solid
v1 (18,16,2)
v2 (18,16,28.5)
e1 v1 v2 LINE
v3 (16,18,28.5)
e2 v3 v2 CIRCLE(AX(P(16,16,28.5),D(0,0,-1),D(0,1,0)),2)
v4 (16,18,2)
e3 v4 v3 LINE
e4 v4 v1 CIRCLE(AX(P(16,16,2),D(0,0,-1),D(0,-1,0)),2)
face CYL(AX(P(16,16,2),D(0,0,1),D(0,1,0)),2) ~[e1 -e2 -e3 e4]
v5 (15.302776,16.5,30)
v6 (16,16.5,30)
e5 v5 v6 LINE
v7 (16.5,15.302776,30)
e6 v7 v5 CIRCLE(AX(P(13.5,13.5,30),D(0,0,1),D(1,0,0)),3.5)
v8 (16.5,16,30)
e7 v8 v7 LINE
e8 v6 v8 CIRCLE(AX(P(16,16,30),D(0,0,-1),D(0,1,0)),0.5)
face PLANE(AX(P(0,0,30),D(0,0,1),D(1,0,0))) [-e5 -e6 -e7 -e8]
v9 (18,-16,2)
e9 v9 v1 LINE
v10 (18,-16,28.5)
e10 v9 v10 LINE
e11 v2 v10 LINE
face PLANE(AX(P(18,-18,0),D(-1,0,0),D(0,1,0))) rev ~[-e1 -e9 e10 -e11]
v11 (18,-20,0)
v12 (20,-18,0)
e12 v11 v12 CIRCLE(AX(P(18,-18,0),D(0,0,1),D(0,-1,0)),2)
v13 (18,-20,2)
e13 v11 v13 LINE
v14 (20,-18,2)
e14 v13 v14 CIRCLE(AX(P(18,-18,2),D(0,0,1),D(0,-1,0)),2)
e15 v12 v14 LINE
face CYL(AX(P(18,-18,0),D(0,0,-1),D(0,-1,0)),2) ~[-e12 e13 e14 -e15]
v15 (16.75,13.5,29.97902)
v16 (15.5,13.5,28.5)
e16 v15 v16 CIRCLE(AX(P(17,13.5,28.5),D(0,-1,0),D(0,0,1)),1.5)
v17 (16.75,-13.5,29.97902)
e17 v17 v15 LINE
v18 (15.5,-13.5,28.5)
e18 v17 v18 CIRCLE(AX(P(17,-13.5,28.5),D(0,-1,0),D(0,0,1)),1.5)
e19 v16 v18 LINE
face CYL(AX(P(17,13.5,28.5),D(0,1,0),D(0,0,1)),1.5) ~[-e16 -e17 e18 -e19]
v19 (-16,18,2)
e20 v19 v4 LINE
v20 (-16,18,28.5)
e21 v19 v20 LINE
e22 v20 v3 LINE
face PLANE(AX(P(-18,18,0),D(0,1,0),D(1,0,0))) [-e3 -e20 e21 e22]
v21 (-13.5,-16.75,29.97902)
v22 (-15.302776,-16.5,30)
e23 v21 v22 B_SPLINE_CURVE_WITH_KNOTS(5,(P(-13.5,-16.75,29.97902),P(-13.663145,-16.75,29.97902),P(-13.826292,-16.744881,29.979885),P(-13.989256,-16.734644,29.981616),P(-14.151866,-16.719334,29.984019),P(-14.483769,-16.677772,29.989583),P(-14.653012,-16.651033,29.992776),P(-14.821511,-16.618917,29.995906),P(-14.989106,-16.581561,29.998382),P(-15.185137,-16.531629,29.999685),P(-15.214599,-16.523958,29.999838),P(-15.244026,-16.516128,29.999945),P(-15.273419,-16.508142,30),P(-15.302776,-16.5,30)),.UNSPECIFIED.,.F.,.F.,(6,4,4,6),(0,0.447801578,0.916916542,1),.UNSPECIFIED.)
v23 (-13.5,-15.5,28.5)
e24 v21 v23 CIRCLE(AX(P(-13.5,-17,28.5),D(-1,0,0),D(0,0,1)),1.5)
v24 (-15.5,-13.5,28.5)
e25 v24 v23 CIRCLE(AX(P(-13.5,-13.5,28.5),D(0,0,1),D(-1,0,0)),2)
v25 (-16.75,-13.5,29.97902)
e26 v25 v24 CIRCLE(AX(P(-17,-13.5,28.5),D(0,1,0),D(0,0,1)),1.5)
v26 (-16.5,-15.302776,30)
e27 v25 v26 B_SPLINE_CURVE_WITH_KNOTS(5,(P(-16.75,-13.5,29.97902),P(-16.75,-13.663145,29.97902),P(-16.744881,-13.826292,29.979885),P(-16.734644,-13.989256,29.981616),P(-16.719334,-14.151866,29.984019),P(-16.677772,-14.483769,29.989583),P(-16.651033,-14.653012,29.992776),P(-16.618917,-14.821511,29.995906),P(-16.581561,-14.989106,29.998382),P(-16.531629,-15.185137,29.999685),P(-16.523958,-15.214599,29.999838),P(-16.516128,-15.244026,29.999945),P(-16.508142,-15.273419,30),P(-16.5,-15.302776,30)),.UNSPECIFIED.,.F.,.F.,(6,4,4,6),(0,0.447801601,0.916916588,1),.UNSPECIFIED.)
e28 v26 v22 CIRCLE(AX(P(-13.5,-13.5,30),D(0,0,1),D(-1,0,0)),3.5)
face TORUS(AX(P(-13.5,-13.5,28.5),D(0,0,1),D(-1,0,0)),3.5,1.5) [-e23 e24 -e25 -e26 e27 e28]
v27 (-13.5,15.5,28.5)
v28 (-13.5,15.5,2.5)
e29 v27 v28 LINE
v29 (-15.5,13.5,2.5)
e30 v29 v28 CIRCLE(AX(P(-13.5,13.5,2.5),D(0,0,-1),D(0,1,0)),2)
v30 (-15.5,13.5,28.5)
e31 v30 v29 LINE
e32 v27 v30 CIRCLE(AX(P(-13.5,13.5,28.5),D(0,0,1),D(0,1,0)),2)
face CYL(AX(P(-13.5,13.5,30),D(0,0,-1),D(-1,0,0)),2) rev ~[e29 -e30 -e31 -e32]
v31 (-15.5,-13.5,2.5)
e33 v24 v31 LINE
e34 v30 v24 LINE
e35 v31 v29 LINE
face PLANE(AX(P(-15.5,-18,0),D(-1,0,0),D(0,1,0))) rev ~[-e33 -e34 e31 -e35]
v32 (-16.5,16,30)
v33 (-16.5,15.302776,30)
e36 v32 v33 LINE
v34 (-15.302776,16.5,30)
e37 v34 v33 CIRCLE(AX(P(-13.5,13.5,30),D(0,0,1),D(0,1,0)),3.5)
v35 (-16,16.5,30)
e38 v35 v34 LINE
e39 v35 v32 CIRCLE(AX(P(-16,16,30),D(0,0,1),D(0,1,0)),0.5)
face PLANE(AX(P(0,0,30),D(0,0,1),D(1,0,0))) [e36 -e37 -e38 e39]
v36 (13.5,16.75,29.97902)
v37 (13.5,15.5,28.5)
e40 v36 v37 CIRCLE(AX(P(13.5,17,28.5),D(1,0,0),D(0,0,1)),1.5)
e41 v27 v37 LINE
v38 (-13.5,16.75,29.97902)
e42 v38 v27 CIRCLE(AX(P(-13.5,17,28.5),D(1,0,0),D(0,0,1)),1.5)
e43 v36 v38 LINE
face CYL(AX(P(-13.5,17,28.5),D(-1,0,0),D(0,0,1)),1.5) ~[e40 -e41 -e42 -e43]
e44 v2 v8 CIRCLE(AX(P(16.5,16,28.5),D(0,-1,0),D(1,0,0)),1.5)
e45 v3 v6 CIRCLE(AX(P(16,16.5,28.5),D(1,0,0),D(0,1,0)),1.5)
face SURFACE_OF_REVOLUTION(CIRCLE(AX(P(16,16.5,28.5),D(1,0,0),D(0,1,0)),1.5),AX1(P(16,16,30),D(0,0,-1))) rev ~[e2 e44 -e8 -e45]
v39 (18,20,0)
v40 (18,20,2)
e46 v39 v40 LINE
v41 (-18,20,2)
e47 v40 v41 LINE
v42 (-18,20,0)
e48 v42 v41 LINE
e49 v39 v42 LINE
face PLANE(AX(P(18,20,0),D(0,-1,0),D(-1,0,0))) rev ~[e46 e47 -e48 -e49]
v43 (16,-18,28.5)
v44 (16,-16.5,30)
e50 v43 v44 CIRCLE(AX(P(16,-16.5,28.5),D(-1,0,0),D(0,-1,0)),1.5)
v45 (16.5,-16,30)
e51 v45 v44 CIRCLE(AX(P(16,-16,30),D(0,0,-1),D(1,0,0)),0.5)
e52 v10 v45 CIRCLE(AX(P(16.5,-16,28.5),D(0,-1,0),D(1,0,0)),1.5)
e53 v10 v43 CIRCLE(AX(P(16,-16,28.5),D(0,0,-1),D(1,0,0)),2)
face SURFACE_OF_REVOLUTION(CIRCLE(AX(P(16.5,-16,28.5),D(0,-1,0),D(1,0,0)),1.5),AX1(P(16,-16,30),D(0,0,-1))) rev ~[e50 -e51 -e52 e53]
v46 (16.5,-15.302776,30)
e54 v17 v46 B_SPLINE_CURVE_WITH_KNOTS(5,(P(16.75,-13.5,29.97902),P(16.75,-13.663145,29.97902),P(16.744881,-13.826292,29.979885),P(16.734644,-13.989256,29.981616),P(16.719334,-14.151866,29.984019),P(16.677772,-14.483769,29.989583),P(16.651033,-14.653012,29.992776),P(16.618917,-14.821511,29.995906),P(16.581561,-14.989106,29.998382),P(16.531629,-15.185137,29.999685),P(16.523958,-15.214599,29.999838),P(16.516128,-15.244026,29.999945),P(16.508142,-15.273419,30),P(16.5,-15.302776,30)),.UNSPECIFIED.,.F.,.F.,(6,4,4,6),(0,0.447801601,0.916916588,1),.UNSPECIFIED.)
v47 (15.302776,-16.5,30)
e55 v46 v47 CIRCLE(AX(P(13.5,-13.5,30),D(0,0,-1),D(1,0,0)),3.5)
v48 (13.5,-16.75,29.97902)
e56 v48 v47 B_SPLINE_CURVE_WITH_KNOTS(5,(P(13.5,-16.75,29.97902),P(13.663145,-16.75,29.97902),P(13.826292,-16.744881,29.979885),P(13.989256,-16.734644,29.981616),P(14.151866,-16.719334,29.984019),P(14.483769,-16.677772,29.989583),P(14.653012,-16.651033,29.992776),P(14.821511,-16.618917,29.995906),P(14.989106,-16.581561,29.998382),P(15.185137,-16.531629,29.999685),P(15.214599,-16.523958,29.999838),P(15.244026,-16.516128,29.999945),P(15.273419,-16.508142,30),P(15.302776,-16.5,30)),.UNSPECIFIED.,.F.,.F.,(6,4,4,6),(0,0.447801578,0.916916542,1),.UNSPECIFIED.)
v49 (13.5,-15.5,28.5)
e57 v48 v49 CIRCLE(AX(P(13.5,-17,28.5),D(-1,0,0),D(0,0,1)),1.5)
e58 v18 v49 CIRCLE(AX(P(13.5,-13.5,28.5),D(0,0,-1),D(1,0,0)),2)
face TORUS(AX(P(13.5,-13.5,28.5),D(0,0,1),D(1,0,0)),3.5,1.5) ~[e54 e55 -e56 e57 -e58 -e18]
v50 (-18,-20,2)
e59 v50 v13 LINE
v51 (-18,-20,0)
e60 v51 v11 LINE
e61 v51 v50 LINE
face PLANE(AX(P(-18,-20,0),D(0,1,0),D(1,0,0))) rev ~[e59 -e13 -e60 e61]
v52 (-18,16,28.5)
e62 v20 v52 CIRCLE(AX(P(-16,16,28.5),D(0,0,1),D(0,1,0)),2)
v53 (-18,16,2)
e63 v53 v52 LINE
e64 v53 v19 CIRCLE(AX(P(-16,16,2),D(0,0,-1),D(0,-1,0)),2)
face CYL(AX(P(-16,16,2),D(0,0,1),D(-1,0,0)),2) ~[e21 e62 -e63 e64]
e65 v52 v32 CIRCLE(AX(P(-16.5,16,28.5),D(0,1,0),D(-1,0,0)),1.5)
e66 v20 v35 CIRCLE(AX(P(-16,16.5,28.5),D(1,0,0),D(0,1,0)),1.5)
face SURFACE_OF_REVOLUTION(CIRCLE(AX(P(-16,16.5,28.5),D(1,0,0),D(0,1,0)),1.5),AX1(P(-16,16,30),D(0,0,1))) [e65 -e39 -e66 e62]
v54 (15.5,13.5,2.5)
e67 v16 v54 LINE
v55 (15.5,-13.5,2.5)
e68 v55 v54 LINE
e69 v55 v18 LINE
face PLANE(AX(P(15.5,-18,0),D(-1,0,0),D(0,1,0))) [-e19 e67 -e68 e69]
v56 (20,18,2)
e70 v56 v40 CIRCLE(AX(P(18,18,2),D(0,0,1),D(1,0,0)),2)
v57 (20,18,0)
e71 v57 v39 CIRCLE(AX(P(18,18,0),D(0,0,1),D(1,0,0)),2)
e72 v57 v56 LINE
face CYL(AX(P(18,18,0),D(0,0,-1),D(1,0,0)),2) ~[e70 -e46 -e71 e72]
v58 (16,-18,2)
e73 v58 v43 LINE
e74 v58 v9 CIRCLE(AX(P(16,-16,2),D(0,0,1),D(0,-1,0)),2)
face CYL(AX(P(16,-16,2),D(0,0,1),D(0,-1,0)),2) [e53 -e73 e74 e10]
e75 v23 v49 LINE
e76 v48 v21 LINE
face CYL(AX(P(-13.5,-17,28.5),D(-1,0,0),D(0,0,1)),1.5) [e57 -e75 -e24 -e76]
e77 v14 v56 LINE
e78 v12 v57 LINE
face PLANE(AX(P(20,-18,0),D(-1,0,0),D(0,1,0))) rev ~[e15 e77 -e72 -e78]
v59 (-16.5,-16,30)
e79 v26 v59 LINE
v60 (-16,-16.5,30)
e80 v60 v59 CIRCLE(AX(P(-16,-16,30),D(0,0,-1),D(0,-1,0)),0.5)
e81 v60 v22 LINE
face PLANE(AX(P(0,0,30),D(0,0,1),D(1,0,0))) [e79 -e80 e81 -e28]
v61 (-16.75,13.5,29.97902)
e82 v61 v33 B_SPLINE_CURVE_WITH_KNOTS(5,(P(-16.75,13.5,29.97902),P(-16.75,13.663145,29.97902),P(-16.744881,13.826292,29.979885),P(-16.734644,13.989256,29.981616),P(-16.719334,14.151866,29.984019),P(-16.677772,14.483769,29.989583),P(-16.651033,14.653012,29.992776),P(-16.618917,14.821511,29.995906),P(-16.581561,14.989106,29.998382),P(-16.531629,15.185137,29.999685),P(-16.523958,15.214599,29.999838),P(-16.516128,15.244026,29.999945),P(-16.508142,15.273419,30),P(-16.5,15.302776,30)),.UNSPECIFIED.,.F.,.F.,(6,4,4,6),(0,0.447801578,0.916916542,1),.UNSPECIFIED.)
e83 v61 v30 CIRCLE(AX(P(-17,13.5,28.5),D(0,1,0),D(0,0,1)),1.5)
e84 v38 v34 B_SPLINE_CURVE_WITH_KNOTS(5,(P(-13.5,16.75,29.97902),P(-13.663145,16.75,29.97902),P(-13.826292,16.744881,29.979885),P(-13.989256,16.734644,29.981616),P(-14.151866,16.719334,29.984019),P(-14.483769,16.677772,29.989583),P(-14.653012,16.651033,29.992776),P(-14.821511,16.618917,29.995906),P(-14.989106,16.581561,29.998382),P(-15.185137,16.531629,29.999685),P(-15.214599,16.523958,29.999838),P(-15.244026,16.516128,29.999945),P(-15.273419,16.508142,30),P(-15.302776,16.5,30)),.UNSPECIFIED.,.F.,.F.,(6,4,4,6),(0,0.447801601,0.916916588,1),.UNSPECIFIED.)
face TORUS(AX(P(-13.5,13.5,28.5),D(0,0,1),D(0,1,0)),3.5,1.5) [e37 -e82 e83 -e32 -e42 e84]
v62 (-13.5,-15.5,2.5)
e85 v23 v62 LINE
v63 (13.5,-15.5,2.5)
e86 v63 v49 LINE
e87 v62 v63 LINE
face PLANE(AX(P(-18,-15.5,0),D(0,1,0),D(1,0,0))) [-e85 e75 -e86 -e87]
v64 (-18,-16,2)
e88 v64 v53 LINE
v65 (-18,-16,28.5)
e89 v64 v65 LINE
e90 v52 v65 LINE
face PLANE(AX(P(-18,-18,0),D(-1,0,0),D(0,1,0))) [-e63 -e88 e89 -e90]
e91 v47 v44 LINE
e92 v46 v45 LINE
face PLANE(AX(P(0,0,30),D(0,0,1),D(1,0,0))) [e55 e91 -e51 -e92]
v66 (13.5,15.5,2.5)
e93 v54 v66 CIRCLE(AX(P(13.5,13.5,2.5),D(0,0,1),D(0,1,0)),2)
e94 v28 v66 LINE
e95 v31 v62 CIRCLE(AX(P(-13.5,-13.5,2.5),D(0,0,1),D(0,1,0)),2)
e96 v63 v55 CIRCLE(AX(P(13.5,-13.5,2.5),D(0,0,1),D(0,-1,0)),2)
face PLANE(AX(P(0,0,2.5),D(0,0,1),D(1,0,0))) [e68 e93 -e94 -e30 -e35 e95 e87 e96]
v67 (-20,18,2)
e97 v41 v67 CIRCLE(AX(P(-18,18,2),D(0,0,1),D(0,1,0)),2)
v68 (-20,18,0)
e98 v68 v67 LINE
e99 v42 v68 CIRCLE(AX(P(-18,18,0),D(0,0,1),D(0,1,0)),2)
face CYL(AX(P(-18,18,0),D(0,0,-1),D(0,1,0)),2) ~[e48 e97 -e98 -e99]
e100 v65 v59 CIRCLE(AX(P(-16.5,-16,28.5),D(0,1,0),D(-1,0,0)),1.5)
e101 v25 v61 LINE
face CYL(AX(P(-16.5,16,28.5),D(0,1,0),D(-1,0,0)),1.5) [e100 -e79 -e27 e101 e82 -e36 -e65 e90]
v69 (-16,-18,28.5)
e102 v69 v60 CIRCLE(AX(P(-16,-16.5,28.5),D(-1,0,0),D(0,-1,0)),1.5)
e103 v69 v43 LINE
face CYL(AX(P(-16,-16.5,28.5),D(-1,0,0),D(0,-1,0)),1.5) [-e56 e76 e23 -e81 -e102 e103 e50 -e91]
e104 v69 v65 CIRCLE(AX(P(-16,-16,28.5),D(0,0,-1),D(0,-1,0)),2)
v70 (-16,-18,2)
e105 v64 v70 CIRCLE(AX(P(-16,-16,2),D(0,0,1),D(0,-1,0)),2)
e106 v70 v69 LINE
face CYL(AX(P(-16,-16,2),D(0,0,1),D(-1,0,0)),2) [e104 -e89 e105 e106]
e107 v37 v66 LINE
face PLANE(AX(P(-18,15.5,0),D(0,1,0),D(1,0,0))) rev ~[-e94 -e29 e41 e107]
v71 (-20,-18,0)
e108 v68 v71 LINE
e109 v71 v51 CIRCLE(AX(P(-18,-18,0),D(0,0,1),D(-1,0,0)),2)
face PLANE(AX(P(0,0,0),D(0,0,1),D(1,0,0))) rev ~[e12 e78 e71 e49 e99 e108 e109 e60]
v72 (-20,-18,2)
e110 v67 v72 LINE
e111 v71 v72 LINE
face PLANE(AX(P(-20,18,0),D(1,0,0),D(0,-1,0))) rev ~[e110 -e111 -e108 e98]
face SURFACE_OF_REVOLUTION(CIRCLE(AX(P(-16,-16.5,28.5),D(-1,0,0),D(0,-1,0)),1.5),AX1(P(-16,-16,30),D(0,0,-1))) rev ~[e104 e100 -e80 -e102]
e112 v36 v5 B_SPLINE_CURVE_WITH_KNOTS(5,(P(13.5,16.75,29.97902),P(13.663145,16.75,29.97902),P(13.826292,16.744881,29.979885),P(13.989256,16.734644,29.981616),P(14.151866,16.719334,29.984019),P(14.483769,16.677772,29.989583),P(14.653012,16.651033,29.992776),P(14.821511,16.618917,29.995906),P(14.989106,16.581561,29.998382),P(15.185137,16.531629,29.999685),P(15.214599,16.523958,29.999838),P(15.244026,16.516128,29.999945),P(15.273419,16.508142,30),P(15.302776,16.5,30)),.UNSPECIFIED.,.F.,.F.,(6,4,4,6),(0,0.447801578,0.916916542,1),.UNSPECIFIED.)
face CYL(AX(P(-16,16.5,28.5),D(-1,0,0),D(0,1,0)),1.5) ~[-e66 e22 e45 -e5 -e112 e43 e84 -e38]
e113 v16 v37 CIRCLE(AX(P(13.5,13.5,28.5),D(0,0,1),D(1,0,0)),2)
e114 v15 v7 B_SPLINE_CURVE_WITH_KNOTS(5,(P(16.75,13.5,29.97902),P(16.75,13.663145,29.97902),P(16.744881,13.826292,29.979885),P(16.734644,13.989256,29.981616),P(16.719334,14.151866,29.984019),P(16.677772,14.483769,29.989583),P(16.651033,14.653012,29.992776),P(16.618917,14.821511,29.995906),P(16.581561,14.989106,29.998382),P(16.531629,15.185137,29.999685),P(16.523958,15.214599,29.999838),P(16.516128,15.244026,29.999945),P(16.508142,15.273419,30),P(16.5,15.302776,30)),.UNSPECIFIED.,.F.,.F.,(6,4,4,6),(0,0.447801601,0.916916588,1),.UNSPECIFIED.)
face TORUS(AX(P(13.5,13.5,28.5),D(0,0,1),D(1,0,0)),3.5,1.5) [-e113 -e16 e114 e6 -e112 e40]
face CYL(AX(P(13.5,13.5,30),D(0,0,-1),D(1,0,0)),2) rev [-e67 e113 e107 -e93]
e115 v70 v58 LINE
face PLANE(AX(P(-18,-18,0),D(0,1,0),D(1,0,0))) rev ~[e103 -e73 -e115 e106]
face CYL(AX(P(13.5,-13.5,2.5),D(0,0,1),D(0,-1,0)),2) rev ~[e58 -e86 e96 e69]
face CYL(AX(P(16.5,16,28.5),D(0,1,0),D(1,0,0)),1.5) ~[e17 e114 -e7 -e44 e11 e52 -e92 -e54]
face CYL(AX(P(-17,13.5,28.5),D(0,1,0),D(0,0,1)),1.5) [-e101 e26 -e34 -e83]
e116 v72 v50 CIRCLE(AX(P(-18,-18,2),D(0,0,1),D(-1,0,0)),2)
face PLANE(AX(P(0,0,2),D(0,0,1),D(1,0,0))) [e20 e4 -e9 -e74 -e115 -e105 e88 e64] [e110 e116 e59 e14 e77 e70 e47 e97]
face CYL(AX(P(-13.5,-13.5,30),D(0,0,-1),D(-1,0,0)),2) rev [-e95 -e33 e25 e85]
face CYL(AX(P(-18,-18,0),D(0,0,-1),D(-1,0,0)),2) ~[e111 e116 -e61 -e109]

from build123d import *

# Parameters (mm, degrees)
F0_W         = 36
F0_H         = 36
F1_DEPTH     = 2
F2_DEPTH     = 30
F3_T         = -2.5
F4_R         = 2
F5_T1_DEPTH  = 32
F5_T3_DEPTH  = 27
F5_T5_DEPTH  = 32
F5_T7_DEPTH  = 27
F5_T10_ANGLE = 90
F5_T12_ANGLE = 90
F5_T14_ANGLE = 90
F5_T16_ANGLE = 90
F5_T18_ANGLE = 90
F5_T20_ANGLE = 90
F5_T22_ANGLE = 90
F5_T24_ANGLE = 90


# Not quite as in the source:
# - a fillet or chamfer that OpenCascade refuses, or shapes differently, is made with other operations: its cross-section is extruded or revolved along the edge and cut away or added


with BuildPart() as f1:
    # F0 (on Top) → F1 (new body)
    with BuildSketch(Plane.XY):
        with BuildLine():
            ThreePointArc((20, 18), (19.4142135624, 19.4142135624), (18, 20))
            Line((18, 20), (-18, 20))
            ThreePointArc((-18, 20), (-19.4142135624, 19.4142135624), (-20, 18))
            Line((-20, 18), (-20, -18))
            ThreePointArc((-20, -18), (-19.4142135624, -19.4142135624), (-18, -20))
            Line((-18, -20), (18, -20))
            ThreePointArc((18, -20), (19.4142135624, -19.4142135624), (20, -18))
            Line((20, -18), (20, 18))
        make_face()
        Rectangle(F0_W, F0_H, mode=Mode.SUBTRACT)
    extrude(amount=F1_DEPTH)

    # F0 (on Top) → F2 (join)
    with BuildSketch(Plane.XY):
        Rectangle(F0_W, F0_H)
    extrude(amount=F2_DEPTH)

    # F3
    f3_openings = [f1.faces().sort_by_distance(p)[0] for p in [
        (0, 0, 30),
    ]]
    offset(amount=F3_T, openings=f3_openings)

    # F4
    f4_edges = [f1.edges().sort_by_distance(p)[0] for p in [
        (-18, -18, 16),
        (18, 18, 16),
        (-18, 18, 16),
        (18, -18, 16),
        (-15.5, -15.5, 16.25),
        (15.5, -15.5, 16.25),
        (15.5, 15.5, 16.25),
        (-15.5, 15.5, 16.25),
    ]]
    fillet(f4_edges, radius=F4_R)

    # F5: fillet of radius 1.5 on 16 edges, made by hand

    # F5_s2 → F5_t1 (cut)
    with BuildSketch(Plane.XZ.offset(-16)):
        with BuildLine():
            ThreePointArc((-18, 28.5), (-17.5606601718, 29.5606601718), (-16.5, 30))
            Line((-16.5, 30), (-18, 30))
            Line((-18, 30), (-18, 28.5))
        make_face()
        with BuildLine():
            ThreePointArc((18, 28.5), (17.5606601718, 29.5606601718), (16.5, 30))
            Line((16.5, 30), (18, 30))
            Line((18, 30), (18, 28.5))
        make_face()
    extrude(amount=F5_T1_DEPTH, mode=Mode.SUBTRACT)

    # F5_s4 → F5_t3 (cut)
    with BuildSketch(Plane.XZ.offset(-13.5)):
        with BuildLine():
            ThreePointArc((-17, 30), (-15.9393398282, 29.5606601718), (-15.5, 28.5))
            Line((-15.5, 28.5), (-15.5, 30))
            Line((-15.5, 30), (-17, 30))
        make_face()
        with BuildLine():
            ThreePointArc((17, 30), (15.9393398282, 29.5606601718), (15.5, 28.5))
            Line((15.5, 28.5), (15.5, 30))
            Line((15.5, 30), (17, 30))
        make_face()
    extrude(amount=F5_T3_DEPTH, mode=Mode.SUBTRACT)

    # F5_s6 → F5_t5 (cut)
    with BuildSketch(Plane.YZ.offset(-16)):
        with BuildLine():
            ThreePointArc((18, 28.5), (17.5606601718, 29.5606601718), (16.5, 30))
            Line((16.5, 30), (18, 30))
            Line((18, 30), (18, 28.5))
        make_face()
        with BuildLine():
            ThreePointArc((-18, 28.5), (-17.5606601718, 29.5606601718), (-16.5, 30))
            Line((-16.5, 30), (-18, 30))
            Line((-18, 30), (-18, 28.5))
        make_face()
    extrude(amount=F5_T5_DEPTH, mode=Mode.SUBTRACT)

    # F5_s8 → F5_t7 (cut)
    with BuildSketch(Plane.YZ.offset(-13.5)):
        with BuildLine():
            ThreePointArc((-17, 30), (-15.9393398282, 29.5606601718), (-15.5, 28.5))
            Line((-15.5, 28.5), (-15.5, 30))
            Line((-15.5, 30), (-17, 30))
        make_face()
        with BuildLine():
            ThreePointArc((17, 30), (15.9393398282, 29.5606601718), (15.5, 28.5))
            Line((15.5, 28.5), (15.5, 30))
            Line((15.5, 30), (17, 30))
        make_face()
    extrude(amount=F5_T7_DEPTH, mode=Mode.SUBTRACT)

    # F5_s9 → F5_t10 (revolve, cut)
    with BuildSketch(Plane.YZ.offset(-16)):
        with BuildLine():
            ThreePointArc((18, 28.5), (17.5606601718, 29.5606601718), (16.5, 30))
            Line((16.5, 30), (18, 30))
            Line((18, 30), (18, 28.5))
        make_face()
    revolve(axis=Axis((-16, 16, 30), (0, 0, 1)), revolution_arc=F5_T10_ANGLE, mode=Mode.SUBTRACT)

    # F5_s11 → F5_t12 (revolve, cut)
    with BuildSketch(Plane.YZ.offset(16)):
        with BuildLine():
            ThreePointArc((18, 28.5), (17.5606601718, 29.5606601718), (16.5, 30))
            Line((16.5, 30), (18, 30))
            Line((18, 30), (18, 28.5))
        make_face()
    revolve(axis=Axis((16, 16, 30), (0, 0, -1)), revolution_arc=F5_T12_ANGLE, mode=Mode.SUBTRACT)

    # F5_s13 → F5_t14 (revolve, cut)
    with BuildSketch(Plane.YZ.offset(-16)):
        with BuildLine():
            ThreePointArc((-18, 28.5), (-17.5606601718, 29.5606601718), (-16.5, 30))
            Line((-16.5, 30), (-18, 30))
            Line((-18, 30), (-18, 28.5))
        make_face()
    revolve(axis=Axis((-16, -16, 30), (0, 0, -1)), revolution_arc=F5_T14_ANGLE, mode=Mode.SUBTRACT)

    # F5_s15 → F5_t16 (revolve, cut)
    with BuildSketch(Plane.XZ.offset(16)):
        with BuildLine():
            ThreePointArc((18, 28.5), (17.5606601718, 29.5606601718), (16.5, 30))
            Line((16.5, 30), (18, 30))
            Line((18, 30), (18, 28.5))
        make_face()
    revolve(axis=Axis((16, -16, 30), (0, 0, -1)), revolution_arc=F5_T16_ANGLE, mode=Mode.SUBTRACT)

    # F5_s17 → F5_t18 (revolve, cut)
    with BuildSketch(Plane.XZ.offset(13.5)):
        with BuildLine():
            ThreePointArc((17, 30), (15.9393398282, 29.5606601718), (15.5, 28.5))
            Line((15.5, 28.5), (15.5, 30))
            Line((15.5, 30), (17, 30))
        make_face()
    revolve(axis=Axis((13.5, -13.5, 30), (0, 0, -1)), revolution_arc=F5_T18_ANGLE, mode=Mode.SUBTRACT)

    # F5_s19 → F5_t20 (revolve, cut)
    with BuildSketch(Plane.XZ.offset(-13.5)):
        with BuildLine():
            ThreePointArc((17, 30), (15.9393398282, 29.5606601718), (15.5, 28.5))
            Line((15.5, 28.5), (15.5, 30))
            Line((15.5, 30), (17, 30))
        make_face()
    revolve(axis=Axis((13.5, 13.5, 30), (0, 0, 1)), revolution_arc=F5_T20_ANGLE, mode=Mode.SUBTRACT)

    # F5_s21 → F5_t22 (revolve, cut)
    with BuildSketch(Plane.XZ.offset(13.5)):
        with BuildLine():
            ThreePointArc((-17, 30), (-15.9393398282, 29.5606601718), (-15.5, 28.5))
            Line((-15.5, 28.5), (-15.5, 30))
            Line((-15.5, 30), (-17, 30))
        make_face()
    revolve(axis=Axis((-13.5, -13.5, 30), (0, 0, 1)), revolution_arc=F5_T22_ANGLE, mode=Mode.SUBTRACT)

    # F5_s23 → F5_t24 (revolve, cut)
    with BuildSketch(Plane.YZ.offset(-13.5)):
        with BuildLine():
            ThreePointArc((17, 30), (15.9393398282, 29.5606601718), (15.5, 28.5))
            Line((15.5, 28.5), (15.5, 30))
            Line((15.5, 30), (17, 30))
        make_face()
    revolve(axis=Axis((-13.5, 13.5, 30), (0, 0, 1)), revolution_arc=F5_T24_ANGLE, mode=Mode.SUBTRACT)


solid = f1.part
